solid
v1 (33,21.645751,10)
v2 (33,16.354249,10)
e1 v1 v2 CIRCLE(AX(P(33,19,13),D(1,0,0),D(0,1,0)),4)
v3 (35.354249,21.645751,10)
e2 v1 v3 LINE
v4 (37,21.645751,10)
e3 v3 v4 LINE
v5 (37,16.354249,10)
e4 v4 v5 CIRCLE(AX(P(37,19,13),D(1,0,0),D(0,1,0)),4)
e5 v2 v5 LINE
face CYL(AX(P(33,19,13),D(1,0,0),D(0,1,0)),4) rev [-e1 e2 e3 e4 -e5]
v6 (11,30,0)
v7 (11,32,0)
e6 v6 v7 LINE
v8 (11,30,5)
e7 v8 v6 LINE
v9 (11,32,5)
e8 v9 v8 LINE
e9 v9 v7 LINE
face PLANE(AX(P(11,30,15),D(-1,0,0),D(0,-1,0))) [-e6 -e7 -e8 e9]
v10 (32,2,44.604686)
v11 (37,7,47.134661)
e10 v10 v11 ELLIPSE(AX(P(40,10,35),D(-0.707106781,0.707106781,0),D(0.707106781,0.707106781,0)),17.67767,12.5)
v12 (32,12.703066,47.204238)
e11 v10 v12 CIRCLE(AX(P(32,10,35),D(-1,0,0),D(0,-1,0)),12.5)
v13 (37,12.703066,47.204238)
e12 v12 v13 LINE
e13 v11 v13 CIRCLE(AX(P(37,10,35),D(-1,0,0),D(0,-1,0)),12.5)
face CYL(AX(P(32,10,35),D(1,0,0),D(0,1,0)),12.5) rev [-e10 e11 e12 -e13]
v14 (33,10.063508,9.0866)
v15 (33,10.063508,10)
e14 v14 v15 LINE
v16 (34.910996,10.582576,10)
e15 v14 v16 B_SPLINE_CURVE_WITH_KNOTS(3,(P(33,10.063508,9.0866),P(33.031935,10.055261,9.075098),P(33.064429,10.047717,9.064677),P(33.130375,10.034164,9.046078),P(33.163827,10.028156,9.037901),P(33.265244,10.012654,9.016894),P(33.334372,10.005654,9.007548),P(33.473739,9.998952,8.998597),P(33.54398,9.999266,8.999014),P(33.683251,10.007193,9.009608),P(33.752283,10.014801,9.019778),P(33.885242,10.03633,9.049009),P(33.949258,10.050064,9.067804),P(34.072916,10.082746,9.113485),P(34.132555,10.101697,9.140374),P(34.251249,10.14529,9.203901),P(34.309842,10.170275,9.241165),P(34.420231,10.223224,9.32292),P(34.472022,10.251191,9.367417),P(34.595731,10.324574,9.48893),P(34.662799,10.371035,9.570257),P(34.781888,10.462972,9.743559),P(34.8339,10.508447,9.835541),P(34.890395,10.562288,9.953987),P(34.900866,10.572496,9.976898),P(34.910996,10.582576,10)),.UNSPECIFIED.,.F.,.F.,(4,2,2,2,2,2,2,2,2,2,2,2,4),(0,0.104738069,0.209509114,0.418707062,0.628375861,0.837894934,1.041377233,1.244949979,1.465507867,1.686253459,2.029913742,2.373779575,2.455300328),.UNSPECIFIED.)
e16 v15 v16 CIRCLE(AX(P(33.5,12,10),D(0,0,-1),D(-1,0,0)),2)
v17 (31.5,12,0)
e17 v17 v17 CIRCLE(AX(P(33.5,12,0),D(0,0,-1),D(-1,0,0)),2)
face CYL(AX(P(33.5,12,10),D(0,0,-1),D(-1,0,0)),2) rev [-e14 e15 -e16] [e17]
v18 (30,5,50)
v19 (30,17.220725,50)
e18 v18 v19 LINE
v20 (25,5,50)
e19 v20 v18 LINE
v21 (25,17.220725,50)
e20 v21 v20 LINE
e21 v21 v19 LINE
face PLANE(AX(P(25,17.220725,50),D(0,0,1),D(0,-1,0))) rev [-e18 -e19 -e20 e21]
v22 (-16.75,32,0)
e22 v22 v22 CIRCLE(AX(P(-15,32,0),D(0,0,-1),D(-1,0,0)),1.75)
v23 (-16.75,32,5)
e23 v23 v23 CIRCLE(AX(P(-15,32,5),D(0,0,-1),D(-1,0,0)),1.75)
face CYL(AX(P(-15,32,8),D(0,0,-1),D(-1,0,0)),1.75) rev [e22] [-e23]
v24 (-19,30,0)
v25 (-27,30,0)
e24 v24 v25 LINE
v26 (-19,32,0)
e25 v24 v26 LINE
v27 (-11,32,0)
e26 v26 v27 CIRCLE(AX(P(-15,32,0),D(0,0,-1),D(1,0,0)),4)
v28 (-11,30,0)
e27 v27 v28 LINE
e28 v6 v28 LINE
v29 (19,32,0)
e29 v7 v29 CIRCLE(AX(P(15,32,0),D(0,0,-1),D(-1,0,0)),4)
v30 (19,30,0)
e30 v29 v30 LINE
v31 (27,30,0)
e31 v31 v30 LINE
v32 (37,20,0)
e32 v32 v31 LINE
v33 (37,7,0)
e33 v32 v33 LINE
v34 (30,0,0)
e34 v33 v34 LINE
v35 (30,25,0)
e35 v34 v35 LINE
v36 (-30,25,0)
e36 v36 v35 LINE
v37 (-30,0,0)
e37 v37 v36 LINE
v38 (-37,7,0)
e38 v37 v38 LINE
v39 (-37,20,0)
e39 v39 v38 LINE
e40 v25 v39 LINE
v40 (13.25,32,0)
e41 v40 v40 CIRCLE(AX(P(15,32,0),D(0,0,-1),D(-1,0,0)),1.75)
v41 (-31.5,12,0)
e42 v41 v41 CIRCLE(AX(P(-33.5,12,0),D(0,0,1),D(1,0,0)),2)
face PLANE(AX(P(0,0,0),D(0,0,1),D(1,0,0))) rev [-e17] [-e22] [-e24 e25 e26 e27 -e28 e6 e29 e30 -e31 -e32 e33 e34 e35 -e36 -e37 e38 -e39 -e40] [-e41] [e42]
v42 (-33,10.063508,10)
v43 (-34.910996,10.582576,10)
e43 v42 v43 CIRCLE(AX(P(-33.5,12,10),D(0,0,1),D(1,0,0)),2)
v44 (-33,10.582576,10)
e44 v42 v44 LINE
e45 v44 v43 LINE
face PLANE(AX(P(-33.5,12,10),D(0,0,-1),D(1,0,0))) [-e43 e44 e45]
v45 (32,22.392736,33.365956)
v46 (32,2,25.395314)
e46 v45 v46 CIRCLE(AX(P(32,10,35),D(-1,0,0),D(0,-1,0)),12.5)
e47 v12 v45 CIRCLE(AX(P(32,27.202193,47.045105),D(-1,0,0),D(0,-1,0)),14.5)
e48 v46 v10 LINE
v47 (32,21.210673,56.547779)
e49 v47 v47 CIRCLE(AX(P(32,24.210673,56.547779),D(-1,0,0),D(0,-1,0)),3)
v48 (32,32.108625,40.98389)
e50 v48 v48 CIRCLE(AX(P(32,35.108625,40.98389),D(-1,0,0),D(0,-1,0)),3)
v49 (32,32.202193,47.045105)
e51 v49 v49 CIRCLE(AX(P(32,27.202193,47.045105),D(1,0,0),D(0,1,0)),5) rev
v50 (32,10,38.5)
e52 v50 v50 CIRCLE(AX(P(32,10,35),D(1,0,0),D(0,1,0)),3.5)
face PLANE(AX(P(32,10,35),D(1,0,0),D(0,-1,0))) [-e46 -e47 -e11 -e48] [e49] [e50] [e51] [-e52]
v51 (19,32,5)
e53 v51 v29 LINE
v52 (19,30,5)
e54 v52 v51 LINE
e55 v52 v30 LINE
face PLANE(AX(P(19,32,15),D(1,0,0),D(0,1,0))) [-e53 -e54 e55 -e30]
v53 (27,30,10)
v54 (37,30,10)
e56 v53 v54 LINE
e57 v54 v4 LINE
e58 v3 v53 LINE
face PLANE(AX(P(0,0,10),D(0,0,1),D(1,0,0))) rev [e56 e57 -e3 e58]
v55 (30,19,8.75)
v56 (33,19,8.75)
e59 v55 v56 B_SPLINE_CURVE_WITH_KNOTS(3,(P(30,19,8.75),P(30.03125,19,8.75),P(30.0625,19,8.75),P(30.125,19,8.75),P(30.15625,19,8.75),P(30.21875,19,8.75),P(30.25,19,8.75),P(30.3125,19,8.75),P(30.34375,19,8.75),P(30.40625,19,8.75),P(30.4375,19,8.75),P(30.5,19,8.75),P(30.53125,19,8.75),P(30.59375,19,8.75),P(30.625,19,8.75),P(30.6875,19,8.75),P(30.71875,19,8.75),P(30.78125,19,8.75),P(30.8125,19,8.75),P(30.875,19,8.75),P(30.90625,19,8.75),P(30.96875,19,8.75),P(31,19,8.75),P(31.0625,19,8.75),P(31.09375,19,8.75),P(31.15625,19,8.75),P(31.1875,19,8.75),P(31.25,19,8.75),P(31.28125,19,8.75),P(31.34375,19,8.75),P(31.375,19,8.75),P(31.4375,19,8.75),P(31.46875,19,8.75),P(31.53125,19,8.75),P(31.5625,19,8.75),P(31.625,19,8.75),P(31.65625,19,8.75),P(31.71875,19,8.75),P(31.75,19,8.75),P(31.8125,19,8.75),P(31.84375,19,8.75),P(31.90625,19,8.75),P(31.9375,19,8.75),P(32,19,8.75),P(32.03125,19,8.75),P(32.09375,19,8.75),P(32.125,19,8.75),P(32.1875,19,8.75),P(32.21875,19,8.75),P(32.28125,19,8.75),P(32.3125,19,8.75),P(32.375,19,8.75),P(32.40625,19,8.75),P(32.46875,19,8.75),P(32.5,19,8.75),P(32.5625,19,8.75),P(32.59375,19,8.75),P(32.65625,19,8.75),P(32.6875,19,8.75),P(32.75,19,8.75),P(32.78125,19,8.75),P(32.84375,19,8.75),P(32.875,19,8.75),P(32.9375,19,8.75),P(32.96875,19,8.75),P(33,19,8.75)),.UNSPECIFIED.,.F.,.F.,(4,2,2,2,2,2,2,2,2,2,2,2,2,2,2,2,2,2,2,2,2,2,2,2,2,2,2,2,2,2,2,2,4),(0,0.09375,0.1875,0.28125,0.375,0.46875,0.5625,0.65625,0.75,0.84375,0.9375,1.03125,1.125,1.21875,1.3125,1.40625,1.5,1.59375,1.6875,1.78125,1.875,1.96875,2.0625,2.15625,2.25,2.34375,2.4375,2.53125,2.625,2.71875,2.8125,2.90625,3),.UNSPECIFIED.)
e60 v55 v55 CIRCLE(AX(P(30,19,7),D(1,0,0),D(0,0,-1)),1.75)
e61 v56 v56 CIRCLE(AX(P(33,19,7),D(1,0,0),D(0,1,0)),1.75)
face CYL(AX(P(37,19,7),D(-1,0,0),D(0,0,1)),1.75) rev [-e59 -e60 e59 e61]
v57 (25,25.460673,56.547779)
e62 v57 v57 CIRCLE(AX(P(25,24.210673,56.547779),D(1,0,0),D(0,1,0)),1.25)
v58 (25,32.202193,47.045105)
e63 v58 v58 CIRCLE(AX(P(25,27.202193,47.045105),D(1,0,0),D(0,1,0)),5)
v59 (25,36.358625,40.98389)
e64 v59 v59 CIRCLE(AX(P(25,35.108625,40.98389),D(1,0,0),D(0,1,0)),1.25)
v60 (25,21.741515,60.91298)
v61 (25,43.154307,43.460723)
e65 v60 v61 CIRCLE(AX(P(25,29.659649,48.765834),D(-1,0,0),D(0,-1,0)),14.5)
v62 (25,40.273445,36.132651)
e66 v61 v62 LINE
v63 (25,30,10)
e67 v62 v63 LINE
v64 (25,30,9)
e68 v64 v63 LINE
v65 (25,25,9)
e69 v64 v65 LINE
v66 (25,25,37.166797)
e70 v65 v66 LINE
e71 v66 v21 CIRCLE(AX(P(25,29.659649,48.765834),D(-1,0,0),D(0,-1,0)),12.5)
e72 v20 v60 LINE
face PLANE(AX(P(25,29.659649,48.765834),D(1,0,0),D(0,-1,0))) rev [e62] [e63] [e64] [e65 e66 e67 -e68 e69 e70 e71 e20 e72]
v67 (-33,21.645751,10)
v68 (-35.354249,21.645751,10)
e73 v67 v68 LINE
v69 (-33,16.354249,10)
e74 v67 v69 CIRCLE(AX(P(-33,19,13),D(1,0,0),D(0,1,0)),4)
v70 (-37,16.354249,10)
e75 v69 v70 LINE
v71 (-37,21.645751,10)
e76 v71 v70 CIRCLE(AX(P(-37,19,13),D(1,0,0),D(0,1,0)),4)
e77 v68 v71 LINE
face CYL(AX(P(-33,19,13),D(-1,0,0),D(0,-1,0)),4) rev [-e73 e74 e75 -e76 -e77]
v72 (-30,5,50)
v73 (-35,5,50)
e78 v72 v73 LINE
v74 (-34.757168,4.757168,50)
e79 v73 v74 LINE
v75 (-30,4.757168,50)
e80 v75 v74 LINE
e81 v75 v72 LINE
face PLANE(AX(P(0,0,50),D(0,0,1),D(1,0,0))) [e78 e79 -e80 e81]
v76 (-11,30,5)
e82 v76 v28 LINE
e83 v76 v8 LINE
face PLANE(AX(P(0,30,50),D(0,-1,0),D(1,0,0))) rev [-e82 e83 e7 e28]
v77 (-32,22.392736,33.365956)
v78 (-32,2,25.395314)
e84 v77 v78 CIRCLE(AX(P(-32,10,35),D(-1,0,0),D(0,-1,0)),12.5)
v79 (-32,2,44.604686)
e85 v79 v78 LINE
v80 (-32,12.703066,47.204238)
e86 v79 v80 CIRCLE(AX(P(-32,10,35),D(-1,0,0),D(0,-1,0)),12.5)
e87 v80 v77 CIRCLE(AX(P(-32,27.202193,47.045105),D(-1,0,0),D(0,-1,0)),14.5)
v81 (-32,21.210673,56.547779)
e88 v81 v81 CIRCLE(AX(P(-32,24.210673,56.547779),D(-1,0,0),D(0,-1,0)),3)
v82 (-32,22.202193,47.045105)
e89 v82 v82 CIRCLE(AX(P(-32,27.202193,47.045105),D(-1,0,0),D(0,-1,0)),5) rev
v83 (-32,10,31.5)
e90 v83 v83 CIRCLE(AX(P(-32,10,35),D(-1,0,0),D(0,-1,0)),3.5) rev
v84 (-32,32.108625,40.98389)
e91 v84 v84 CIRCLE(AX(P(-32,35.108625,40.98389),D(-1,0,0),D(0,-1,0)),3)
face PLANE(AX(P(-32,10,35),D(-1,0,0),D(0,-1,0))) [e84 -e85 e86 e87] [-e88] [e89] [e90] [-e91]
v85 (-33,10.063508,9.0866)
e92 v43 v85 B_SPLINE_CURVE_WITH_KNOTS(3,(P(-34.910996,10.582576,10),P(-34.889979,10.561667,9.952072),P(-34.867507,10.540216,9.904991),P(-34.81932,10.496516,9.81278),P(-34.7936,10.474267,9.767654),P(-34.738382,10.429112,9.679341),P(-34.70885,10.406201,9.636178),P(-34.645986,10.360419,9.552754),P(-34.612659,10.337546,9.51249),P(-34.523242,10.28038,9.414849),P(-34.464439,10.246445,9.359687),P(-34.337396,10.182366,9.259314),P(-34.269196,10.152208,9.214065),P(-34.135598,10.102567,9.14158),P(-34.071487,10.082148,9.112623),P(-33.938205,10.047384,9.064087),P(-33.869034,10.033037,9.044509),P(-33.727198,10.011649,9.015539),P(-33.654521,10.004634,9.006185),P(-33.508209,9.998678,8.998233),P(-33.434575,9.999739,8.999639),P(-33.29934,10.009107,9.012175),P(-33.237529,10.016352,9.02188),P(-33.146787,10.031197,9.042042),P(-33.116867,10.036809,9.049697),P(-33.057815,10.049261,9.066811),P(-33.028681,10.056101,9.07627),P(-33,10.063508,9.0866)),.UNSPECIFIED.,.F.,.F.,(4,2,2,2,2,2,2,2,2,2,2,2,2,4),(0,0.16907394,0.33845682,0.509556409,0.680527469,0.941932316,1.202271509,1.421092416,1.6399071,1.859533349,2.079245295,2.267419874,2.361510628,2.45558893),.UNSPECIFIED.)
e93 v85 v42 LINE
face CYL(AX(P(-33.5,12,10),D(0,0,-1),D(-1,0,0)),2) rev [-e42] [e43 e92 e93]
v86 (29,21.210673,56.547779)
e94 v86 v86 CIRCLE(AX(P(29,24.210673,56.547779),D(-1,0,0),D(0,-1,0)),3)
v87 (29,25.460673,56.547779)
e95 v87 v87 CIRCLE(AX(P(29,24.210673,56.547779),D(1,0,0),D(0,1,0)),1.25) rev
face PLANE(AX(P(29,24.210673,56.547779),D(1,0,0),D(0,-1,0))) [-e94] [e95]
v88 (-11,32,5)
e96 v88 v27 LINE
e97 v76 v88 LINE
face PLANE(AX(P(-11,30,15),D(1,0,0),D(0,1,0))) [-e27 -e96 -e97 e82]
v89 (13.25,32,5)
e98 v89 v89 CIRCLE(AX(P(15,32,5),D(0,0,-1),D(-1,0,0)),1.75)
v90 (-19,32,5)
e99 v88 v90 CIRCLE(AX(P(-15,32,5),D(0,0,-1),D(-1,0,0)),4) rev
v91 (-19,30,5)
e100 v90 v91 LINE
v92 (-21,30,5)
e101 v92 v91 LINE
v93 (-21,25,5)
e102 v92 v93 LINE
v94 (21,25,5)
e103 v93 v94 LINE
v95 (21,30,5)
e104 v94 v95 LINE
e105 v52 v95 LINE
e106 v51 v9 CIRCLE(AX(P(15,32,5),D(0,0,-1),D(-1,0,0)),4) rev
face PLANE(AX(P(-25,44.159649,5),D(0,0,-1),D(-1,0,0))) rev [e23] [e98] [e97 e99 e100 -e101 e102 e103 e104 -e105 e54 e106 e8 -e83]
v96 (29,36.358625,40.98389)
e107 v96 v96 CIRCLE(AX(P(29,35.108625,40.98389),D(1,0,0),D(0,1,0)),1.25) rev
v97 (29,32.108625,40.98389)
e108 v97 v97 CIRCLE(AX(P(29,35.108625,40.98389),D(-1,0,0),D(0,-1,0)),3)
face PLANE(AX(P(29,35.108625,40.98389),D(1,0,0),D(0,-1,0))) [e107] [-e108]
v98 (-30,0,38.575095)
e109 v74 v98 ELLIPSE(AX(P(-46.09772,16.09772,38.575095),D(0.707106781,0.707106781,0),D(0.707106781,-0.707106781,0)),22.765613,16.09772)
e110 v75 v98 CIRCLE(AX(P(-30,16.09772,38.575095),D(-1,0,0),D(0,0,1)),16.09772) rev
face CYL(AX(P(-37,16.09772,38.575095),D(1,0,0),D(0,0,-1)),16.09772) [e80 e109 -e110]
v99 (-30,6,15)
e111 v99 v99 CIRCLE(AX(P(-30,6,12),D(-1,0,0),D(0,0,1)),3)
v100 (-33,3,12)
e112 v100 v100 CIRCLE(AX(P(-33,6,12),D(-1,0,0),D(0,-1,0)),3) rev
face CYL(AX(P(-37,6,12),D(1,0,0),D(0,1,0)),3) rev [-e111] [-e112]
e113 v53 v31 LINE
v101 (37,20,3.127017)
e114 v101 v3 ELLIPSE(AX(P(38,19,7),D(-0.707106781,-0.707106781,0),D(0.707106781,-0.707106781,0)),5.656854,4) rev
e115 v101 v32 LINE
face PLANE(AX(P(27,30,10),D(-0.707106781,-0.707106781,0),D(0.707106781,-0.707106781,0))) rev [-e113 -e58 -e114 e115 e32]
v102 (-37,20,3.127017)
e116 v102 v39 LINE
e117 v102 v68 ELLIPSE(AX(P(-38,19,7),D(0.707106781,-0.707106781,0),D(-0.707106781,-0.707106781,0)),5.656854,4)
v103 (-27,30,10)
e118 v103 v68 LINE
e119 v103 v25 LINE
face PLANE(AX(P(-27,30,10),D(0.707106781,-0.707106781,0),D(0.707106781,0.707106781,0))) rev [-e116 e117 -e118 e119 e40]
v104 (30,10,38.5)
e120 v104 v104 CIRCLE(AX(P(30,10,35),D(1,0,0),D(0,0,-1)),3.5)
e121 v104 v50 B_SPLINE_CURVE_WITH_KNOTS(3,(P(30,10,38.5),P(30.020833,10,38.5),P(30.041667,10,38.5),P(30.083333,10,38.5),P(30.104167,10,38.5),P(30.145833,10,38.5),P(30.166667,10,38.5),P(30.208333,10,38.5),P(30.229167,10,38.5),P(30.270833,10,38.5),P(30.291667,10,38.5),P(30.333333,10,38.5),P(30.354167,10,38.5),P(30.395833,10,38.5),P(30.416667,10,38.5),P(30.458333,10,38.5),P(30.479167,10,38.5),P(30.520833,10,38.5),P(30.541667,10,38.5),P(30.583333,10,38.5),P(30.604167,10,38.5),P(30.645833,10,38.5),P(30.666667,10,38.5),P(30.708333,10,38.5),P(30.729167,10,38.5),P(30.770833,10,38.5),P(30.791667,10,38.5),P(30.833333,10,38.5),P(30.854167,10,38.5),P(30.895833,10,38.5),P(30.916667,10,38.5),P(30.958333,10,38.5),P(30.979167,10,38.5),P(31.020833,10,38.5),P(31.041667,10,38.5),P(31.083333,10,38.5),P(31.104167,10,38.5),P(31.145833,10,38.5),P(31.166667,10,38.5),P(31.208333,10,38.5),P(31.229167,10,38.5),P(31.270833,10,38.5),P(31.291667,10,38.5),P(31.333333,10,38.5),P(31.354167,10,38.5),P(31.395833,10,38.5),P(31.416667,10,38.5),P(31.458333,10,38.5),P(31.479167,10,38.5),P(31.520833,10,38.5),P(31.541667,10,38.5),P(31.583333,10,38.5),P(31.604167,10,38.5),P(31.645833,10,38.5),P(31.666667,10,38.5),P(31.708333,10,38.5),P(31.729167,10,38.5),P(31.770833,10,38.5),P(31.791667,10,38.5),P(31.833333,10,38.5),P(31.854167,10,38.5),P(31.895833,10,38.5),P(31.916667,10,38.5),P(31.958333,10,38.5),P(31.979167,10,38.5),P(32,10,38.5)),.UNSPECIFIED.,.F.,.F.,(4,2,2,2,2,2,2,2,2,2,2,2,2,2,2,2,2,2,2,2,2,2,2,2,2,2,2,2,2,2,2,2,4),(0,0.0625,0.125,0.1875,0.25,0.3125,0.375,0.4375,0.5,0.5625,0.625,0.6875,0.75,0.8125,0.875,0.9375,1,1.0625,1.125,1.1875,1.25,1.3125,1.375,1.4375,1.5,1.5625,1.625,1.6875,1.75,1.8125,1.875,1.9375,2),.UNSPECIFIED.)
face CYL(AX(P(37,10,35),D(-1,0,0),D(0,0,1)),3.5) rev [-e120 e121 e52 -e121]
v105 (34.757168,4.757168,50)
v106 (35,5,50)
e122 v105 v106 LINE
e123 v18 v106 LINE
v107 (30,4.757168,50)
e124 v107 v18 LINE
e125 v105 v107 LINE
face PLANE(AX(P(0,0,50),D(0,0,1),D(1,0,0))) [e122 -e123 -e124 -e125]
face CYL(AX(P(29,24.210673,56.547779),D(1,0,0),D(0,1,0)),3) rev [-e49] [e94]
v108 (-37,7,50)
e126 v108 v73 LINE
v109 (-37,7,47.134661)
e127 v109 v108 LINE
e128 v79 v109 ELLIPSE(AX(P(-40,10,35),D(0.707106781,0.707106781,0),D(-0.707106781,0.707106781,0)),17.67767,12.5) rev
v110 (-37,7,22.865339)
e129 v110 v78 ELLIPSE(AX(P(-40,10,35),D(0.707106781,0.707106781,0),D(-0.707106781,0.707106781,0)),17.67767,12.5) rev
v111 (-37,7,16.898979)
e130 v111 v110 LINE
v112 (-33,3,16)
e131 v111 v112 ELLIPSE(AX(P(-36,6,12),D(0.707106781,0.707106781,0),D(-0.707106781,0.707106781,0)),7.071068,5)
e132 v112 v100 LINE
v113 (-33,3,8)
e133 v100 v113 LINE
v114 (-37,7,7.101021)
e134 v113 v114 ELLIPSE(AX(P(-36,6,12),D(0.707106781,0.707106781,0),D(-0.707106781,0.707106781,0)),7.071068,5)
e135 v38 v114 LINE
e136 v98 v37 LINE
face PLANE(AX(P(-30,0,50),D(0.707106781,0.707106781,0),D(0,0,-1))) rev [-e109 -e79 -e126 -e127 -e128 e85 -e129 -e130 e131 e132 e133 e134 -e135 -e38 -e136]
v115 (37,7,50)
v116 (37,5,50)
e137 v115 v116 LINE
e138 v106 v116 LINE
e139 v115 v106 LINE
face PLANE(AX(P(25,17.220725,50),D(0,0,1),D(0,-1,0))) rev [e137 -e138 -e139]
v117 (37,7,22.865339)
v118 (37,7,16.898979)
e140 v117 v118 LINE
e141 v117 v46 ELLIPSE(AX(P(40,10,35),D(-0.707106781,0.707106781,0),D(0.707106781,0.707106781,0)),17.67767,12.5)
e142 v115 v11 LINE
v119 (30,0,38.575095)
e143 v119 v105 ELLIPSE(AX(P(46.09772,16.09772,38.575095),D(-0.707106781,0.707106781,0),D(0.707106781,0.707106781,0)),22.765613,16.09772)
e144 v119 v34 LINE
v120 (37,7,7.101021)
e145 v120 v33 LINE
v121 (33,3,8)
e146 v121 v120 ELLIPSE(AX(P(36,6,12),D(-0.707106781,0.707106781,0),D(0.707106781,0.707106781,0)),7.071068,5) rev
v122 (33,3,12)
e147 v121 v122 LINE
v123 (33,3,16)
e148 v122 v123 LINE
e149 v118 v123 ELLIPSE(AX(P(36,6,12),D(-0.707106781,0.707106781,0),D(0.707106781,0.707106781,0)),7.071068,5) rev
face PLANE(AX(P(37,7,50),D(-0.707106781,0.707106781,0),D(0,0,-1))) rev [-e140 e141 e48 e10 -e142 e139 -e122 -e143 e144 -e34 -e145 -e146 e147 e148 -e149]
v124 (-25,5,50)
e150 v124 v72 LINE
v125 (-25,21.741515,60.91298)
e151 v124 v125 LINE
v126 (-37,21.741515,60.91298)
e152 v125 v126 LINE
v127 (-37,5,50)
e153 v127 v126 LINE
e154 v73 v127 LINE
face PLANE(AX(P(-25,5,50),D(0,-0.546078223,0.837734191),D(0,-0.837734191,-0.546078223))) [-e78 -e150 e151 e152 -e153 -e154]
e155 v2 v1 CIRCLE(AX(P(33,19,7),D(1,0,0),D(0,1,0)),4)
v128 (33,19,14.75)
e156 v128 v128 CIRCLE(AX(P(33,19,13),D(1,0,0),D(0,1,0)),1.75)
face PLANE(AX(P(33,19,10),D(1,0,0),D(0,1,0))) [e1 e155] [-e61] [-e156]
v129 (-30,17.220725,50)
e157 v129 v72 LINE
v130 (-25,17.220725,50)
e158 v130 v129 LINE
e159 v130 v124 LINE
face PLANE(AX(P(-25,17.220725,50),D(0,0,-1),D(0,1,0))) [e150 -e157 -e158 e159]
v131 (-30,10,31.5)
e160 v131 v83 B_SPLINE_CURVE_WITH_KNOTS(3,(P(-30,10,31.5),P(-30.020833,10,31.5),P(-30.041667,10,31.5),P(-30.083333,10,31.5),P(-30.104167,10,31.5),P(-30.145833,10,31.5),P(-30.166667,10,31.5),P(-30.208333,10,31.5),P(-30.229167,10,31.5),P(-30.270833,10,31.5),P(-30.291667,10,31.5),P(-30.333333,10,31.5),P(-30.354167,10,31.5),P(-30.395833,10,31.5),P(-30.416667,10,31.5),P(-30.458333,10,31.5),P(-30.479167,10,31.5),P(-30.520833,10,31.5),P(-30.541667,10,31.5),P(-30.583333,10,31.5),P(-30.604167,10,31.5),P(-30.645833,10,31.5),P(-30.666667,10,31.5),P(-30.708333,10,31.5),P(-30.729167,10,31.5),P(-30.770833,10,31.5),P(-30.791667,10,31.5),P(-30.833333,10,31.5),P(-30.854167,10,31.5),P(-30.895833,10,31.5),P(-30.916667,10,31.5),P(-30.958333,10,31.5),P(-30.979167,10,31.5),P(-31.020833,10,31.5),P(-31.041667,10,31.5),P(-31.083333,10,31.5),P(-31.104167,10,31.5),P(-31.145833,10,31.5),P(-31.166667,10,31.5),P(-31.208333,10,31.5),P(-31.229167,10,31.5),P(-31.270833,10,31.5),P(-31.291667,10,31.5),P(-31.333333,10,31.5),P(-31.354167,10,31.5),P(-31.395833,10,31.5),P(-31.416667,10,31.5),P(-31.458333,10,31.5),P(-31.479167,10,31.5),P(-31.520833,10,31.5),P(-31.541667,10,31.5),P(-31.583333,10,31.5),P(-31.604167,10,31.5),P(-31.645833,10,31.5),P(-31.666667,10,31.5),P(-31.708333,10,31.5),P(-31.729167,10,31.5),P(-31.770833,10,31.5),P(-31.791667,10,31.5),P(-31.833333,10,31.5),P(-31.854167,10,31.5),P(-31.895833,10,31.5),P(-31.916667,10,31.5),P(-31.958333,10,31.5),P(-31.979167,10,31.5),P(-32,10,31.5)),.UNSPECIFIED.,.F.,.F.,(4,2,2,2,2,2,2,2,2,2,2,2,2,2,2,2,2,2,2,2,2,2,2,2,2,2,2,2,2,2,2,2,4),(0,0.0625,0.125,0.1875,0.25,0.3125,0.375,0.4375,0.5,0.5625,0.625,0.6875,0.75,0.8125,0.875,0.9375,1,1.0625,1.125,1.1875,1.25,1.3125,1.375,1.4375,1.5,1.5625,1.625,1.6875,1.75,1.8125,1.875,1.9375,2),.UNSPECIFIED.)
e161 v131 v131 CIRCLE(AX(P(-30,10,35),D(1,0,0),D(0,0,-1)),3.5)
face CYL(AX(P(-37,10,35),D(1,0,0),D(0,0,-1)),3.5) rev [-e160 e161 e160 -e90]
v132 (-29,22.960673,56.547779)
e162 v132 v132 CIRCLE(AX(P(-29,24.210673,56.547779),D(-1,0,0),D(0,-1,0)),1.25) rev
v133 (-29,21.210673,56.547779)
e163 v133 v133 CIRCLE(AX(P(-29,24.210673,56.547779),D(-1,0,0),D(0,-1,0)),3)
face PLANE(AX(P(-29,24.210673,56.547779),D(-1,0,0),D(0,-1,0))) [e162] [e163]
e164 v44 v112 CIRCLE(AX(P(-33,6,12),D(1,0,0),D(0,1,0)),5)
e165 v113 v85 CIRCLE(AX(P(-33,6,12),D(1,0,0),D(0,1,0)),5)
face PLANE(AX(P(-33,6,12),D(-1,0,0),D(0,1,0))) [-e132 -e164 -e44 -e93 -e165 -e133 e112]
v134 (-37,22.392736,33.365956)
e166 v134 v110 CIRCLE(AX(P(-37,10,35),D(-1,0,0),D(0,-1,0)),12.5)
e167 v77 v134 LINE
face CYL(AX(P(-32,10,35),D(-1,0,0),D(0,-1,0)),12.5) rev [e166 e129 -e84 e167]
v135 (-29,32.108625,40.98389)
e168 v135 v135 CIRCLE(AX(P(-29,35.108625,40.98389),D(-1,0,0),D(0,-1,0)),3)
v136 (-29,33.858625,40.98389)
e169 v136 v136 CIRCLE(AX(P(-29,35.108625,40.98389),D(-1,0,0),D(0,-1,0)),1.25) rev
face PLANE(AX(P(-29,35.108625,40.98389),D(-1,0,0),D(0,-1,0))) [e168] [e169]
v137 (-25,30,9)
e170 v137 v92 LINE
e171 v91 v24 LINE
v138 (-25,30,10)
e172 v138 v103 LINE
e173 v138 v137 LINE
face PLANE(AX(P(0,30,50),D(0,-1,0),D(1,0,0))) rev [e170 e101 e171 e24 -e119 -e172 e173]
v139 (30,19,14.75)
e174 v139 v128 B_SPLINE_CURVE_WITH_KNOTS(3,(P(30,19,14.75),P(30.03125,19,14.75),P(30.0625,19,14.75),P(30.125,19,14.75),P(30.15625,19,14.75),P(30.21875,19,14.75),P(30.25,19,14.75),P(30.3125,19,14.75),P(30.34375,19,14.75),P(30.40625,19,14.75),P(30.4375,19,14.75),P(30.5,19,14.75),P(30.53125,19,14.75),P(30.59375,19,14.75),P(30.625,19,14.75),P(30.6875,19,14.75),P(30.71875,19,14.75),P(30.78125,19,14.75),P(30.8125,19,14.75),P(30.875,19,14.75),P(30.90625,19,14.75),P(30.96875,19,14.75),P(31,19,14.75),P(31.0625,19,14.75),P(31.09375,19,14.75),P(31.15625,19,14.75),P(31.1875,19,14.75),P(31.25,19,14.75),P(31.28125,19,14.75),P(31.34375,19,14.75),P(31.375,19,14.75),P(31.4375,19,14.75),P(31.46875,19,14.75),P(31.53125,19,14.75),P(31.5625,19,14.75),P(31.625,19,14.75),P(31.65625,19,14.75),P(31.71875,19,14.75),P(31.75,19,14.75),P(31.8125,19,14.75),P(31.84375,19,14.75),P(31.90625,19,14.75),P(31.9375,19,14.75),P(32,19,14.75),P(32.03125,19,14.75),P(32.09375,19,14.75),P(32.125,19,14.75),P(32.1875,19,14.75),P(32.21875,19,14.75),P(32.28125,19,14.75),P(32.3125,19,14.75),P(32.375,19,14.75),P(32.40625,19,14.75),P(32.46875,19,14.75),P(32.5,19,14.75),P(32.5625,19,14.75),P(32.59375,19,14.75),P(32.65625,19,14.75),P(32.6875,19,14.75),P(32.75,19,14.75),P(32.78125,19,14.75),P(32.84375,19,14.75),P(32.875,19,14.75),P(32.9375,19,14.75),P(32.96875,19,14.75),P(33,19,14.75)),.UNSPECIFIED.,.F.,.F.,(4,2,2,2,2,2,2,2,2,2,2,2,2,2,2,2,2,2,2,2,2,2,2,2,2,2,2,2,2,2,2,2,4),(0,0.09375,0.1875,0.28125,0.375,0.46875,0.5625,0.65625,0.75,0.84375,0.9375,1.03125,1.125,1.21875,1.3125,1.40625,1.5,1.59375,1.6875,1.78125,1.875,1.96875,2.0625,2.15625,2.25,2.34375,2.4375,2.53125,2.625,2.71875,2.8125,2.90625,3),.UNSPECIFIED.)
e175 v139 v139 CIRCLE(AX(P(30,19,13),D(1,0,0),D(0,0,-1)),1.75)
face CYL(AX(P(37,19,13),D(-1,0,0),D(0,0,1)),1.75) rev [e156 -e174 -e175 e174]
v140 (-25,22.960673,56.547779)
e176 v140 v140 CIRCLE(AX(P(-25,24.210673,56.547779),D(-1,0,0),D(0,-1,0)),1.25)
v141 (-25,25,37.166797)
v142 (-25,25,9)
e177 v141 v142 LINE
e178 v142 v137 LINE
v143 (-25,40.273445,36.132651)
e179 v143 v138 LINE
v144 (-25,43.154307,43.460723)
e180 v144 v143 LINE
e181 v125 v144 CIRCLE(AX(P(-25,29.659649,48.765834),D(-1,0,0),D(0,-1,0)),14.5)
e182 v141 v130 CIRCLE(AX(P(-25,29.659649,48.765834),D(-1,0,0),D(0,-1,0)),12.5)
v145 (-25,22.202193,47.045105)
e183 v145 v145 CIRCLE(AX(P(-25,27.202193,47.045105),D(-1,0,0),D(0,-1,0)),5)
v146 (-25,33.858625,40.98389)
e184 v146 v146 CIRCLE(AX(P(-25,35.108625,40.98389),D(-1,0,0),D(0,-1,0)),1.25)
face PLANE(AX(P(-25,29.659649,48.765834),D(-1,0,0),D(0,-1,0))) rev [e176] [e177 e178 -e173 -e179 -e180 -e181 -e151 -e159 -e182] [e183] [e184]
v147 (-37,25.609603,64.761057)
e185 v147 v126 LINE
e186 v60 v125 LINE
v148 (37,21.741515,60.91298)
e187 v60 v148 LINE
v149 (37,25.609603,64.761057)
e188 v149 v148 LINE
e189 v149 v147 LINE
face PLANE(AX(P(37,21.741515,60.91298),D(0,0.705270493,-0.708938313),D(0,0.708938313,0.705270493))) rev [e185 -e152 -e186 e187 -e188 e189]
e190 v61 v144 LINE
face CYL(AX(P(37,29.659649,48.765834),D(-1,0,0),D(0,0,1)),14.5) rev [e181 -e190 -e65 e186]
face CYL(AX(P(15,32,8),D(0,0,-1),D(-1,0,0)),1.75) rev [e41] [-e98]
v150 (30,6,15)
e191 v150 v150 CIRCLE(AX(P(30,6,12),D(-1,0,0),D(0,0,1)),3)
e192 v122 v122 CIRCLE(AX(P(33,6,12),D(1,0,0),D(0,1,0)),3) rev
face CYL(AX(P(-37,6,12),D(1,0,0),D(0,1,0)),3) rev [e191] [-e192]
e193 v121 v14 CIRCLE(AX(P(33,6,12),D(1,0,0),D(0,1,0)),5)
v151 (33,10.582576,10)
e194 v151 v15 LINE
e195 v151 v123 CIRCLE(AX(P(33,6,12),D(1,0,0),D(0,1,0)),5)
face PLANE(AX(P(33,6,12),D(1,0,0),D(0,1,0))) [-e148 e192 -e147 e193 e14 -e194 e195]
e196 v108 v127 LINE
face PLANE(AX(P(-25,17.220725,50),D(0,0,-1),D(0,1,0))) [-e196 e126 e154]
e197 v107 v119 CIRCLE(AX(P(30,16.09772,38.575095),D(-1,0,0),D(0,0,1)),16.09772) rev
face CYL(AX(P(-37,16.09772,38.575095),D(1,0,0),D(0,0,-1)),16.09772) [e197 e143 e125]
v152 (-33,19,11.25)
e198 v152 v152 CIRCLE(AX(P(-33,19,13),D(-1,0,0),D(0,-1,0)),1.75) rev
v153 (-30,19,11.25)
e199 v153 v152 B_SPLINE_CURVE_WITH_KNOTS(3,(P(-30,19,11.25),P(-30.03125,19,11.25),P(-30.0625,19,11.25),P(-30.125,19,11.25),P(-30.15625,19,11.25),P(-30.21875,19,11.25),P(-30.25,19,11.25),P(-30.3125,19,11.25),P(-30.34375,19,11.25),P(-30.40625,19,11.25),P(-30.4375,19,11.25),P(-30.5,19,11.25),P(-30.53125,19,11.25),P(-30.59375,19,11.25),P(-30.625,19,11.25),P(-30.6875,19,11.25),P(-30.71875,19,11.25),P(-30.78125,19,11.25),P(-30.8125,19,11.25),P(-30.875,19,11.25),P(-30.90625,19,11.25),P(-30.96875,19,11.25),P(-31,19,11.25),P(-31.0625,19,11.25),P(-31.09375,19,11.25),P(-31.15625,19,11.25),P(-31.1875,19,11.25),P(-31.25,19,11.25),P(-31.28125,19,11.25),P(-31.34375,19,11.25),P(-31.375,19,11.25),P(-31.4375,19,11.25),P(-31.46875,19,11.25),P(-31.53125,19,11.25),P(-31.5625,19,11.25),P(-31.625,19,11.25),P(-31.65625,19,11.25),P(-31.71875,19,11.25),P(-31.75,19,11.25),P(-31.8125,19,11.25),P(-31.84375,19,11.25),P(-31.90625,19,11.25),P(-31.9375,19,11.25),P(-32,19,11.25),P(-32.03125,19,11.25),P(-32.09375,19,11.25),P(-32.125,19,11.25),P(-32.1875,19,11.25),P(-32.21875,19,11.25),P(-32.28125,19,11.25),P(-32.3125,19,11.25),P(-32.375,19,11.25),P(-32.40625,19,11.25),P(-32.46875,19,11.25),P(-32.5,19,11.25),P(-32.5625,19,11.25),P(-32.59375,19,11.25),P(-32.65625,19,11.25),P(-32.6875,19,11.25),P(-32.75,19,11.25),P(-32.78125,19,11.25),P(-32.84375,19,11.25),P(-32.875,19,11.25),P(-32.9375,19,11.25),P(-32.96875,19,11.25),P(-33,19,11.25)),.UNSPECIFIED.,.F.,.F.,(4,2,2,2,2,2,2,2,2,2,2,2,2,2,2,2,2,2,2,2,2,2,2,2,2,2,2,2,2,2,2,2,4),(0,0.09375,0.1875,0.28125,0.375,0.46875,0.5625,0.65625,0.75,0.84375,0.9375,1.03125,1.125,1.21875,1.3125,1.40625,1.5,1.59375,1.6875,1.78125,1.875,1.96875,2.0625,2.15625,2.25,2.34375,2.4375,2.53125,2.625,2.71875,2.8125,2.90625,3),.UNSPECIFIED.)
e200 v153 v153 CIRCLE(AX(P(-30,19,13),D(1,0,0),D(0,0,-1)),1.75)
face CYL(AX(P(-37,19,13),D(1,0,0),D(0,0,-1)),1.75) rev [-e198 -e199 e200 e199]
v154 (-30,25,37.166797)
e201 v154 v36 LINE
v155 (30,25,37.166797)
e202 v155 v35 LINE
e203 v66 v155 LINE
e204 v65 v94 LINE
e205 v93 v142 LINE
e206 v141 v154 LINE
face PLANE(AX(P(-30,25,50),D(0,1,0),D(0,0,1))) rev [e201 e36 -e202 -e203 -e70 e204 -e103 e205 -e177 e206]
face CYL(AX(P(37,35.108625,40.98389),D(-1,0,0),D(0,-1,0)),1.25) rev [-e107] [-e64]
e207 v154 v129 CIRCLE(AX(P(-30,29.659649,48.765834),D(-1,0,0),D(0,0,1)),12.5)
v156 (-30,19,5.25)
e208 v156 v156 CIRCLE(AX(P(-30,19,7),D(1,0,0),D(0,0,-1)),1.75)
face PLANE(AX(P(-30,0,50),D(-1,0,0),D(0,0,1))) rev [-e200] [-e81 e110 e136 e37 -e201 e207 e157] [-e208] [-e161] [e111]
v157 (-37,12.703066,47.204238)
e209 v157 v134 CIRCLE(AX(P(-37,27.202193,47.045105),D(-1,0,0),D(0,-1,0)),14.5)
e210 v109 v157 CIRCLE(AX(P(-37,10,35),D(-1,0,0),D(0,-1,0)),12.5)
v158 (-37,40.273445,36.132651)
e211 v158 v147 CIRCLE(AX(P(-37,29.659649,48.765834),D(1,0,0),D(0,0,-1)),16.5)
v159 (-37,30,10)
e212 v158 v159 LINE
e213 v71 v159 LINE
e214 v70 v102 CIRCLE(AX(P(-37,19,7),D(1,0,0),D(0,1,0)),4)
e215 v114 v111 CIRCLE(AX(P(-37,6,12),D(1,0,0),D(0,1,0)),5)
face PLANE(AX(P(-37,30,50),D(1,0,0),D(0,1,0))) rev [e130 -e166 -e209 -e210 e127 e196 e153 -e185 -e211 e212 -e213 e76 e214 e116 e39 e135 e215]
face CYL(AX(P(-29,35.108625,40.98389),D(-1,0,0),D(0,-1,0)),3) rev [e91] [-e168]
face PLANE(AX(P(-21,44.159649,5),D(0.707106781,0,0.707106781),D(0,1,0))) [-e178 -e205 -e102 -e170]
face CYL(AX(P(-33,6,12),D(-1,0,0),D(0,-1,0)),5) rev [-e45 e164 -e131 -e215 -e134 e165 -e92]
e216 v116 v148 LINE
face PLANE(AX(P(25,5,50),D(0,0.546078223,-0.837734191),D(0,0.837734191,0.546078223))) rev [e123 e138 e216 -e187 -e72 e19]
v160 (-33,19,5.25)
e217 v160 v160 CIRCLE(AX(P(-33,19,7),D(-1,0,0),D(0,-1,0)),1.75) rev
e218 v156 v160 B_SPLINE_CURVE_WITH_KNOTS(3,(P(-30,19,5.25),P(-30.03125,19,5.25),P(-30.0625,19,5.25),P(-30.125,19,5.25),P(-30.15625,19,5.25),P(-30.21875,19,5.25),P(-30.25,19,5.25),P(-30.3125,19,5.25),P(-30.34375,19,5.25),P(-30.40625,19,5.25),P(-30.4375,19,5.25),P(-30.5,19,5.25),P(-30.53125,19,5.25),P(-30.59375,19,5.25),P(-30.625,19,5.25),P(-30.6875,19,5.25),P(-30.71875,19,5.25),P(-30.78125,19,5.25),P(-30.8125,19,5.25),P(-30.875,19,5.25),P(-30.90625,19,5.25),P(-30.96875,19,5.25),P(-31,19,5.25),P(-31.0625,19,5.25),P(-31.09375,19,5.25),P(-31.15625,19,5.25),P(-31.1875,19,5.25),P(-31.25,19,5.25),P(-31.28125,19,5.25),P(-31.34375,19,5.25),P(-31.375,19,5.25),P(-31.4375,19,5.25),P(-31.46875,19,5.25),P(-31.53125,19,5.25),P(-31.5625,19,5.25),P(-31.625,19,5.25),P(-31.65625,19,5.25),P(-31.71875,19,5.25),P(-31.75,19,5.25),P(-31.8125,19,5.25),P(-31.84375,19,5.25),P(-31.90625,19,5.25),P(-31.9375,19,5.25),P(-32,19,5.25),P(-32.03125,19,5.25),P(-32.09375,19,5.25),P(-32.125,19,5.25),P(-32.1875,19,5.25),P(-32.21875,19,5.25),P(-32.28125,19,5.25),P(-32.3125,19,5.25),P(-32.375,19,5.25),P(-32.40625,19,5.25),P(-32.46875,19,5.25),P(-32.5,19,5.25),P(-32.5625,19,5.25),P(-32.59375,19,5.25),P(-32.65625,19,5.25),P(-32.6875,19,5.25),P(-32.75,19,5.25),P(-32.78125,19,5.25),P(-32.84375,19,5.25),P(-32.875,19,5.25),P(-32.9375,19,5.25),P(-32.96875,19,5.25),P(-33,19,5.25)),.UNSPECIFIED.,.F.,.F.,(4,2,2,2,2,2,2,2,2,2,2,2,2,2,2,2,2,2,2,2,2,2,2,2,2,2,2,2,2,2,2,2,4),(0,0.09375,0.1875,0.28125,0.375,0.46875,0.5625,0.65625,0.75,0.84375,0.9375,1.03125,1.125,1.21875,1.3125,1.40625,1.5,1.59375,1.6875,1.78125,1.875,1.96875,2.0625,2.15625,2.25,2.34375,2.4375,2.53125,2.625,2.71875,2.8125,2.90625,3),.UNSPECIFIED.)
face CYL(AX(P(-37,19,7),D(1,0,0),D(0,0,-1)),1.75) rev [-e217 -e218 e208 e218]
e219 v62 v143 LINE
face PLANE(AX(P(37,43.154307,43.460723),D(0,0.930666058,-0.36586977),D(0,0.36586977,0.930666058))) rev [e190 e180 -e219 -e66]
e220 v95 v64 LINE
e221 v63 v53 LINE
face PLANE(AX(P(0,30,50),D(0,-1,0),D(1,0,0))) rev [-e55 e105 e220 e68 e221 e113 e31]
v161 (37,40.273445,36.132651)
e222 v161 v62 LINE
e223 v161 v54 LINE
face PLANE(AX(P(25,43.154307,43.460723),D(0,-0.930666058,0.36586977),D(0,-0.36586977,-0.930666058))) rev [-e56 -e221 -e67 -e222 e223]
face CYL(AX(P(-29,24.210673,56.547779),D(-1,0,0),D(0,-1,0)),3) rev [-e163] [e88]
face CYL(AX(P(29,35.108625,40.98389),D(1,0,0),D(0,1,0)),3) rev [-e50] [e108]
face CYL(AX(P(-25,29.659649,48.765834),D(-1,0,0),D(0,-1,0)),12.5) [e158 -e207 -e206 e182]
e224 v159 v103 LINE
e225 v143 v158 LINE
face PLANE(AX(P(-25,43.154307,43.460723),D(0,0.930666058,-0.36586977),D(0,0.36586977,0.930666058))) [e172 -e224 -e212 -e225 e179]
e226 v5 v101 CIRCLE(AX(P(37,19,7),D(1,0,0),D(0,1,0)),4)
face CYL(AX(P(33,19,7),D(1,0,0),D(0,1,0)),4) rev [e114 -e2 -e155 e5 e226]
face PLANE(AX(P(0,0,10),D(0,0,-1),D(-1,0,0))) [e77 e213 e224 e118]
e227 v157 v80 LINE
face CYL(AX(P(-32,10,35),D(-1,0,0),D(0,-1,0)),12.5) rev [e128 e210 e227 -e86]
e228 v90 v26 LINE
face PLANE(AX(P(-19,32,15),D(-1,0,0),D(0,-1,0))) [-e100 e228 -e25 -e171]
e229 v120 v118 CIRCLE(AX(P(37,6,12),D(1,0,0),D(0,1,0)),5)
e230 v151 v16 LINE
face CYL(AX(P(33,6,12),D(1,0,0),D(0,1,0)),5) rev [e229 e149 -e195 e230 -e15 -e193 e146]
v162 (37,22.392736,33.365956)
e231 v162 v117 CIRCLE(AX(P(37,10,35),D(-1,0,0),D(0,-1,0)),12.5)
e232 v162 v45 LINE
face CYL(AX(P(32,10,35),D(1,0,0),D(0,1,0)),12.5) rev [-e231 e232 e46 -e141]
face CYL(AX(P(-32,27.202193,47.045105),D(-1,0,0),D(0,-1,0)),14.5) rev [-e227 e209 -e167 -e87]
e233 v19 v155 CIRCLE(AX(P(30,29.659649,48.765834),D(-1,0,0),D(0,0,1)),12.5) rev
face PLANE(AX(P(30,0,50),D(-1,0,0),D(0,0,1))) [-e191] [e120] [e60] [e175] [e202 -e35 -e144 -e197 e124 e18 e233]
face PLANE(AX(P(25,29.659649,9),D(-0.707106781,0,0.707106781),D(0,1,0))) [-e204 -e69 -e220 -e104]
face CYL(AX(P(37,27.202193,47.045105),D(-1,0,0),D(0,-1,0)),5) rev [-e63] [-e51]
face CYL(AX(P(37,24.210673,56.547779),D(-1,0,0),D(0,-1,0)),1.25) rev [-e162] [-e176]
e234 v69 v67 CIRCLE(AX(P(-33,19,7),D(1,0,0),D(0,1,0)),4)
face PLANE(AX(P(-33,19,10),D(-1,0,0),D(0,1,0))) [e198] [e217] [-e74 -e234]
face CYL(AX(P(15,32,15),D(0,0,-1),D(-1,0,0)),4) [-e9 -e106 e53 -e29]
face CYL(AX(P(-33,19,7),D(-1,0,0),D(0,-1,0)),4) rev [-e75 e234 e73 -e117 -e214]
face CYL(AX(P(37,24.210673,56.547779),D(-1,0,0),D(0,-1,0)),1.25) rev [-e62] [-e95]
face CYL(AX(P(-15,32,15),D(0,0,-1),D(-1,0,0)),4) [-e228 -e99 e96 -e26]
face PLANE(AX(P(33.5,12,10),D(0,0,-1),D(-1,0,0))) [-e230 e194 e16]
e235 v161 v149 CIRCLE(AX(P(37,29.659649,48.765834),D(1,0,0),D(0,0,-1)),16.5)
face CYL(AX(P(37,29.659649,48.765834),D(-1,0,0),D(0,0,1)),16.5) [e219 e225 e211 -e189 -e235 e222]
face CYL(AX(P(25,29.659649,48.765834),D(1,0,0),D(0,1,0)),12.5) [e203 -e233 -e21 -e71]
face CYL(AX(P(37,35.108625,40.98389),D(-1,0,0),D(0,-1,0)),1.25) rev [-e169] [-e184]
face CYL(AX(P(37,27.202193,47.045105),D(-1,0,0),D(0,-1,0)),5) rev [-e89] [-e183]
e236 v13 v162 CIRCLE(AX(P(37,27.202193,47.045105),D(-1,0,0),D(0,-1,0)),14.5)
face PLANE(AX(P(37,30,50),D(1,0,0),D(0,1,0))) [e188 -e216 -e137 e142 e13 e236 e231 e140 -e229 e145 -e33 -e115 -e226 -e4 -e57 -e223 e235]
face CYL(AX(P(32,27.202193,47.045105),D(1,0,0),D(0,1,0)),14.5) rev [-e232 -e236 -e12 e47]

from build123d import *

# Parameters (mm, degrees)
BOSS_EXTRUDE1_DEPTH      = 50
CHAMFER1_SIZE            = 7
SKETCH2_R                = 3.5
CUT_EXTRUDE1_DEPTH       = 66.574385243
SKETCH3_R                = 1.75
CUT_EXTRUDE2_DEPTH       = 66.574385243
SKETCH5_R                = 12.5
CUT_EXTRUDE4_DEPTH       = 5
BOSS_EXTRUDE2_DEPTH      = 12
SKETCH4_W                = 50
SKETCH4_H                = 45
CUT_EXTRUDE3_DEPTH       = 78.43749616
SKETCH7_R                = 1.25
SKETCH7_R_2              = 5
CUT_EXTRUDE5_DEPTH       = 107.904819428
SKETCH8_R                = 14.5
CUT_EXTRUDE6_DEPTH       = 5
SKETCH9_R                = 3
CUT_EXTRUDE7_DEPTH       = 3
SKETCH11_R               = 2
CUT_EXTRUDE8_DEPTH       = 10
BOSS_EXTRUDE3_DEPTH      = 37
SKETCH12_R               = 3
CUT_EXTRUDE9_DEPTH       = 109.932742328
SKETCH13_R               = 5
CUT_EXTRUDE10_DEPTH      = 4
BOSS_EXTRUDE4_DEPTH      = 5
SKETCH16_R               = 1.75
CUT_EXTRUDE12_DEPTH      = 8
CHAMFER2_SIZE            = 4
CUT_EXTRUDE14_DEPTH      = 10
CUT_EXTRUDE15_DEPTH      = 89.087129357
CUT_EXTRUDE15_DEPTH_BACK = 89.087129357


# Read off the part's stored shape, not the designer's step: Mirror1
with BuildPart() as part:
    # Sketch1 → Boss-Extrude1 (new body)
    with BuildSketch(Plane.XY):
        Polygon((-30, 0), (-30, 25), (0, 25), (0, 30), (-37, 30), (-37, 0), align=None)
    extrude(amount=BOSS_EXTRUDE1_DEPTH)

    # Chamfer1
    chamfer1_edges = [part.edges().sort_by_distance(p)[0] for p in [
        (-37, 0, 25),
    ]]
    chamfer(chamfer1_edges, length=CHAMFER1_SIZE - 0.0001)  # a hair under: the kernel refuses the full size

    # Sketch2 → Cut-Extrude1 (cut, through all)
    with BuildSketch(Plane(origin=(-30, 0, 0), x_dir=(0, 0, -1), z_dir=(1, 0, 0))):
        with Locations((-35, 10)):
            Circle(SKETCH2_R)
    extrude(amount=-CUT_EXTRUDE1_DEPTH, mode=Mode.SUBTRACT)

    # Sketch3 → Cut-Extrude2 (cut, through all)
    with BuildSketch(Plane(origin=(-30, 0, 0), x_dir=(0, 0, -1), z_dir=(1, 0, 0))):
        with Locations((-7, 19)):
            Circle(SKETCH3_R)
        with Locations((-13, 19)):
            Circle(SKETCH3_R)
    extrude(amount=-CUT_EXTRUDE2_DEPTH, mode=Mode.SUBTRACT)

    # Sketch5 → Cut-Extrude4 (cut)
    with BuildSketch(Plane.ZY.offset(37)):
        with Locations((35, 10)):
            Circle(SKETCH5_R)
    extrude(amount=-CUT_EXTRUDE4_DEPTH, mode=Mode.SUBTRACT)

    # Sketch6 → Boss-Extrude2 (add)
    with BuildSketch(Plane.ZY.offset(37)):
        with BuildLine():
            Line((43.46072281, 43.154306904), (10, 30))
            Line((10, 30), (36.270468882, 30))
            ThreePointArc((36.270468882, 30), (40.249313761, 20.509847154), (50, 17.220724855))
            Line((50, 17.220724855), (50, 5))
            Line((50, 5), (60.912980238, 21.741514829))
            ThreePointArc((60.912980238, 21.741514829), (60.005508568, 38.820420112), (43.46072281, 43.154306904))
        make_face()
    extrude(amount=-BOSS_EXTRUDE2_DEPTH)

    # Mirror1: part across plane


with BuildPart() as part_1:
    add(part.part)
    add(part.part.mirror(Plane(origin=(0, 0, 0), x_dir=(0, 0, 1), z_dir=(1, 0, 0))))

    # Sketch4 → Cut-Extrude3 (cut, through all)
    with BuildSketch(Plane.XZ.offset(-25)):
        with Locations((0, 27.5)):
            Rectangle(SKETCH4_W, SKETCH4_H)
    extrude(amount=-CUT_EXTRUDE3_DEPTH, mode=Mode.SUBTRACT)

    # Sketch7 → Cut-Extrude5 (cut, through all)
    with BuildSketch(Plane.ZY.offset(37)):
        with Locations(Location((40.983890052, 35.108625208, 0), (0, 0, 270))):
            Circle(SKETCH7_R)
        with Locations(Location((56.547778893, 24.210672918, 0), (0, 0, 270))):
            Circle(SKETCH7_R)
        with Locations(Location((47.045105163, 27.20219293, 0), (0, 0, 270))):
            Circle(SKETCH7_R_2)
    extrude(amount=-CUT_EXTRUDE5_DEPTH, mode=Mode.SUBTRACT)

    # Sketch8 → Cut-Extrude6 (cut)
    with BuildSketch(Plane.ZY.offset(37)):
        with Locations((47.045105163, 27.20219293)):
            Circle(SKETCH8_R)
    cut_extrude6 = extrude(amount=-CUT_EXTRUDE6_DEPTH, mode=Mode.SUBTRACT)

    # Sketch9 → Cut-Extrude7 (cut)
    with BuildSketch(Plane.ZY.offset(32)):
        with Locations(Location((40.983890052, 35.108625208, 0), (0, 0, 270))):
            Circle(SKETCH9_R)
        with Locations(Location((56.547778893, 24.210672918, 0), (0, 0, 270))):
            Circle(SKETCH9_R)
    cut_extrude7 = extrude(amount=-CUT_EXTRUDE7_DEPTH, mode=Mode.SUBTRACT)

    # Sketch11 → Cut-Extrude8 (cut)
    with BuildSketch(Plane(origin=(0, 0, 0), x_dir=(-1, 0, 0), z_dir=(0, 0, -1))):
        with Locations((-33.5, 12)):
            Circle(SKETCH11_R)
    cut_extrude8 = extrude(amount=-CUT_EXTRUDE8_DEPTH, mode=Mode.SUBTRACT)

    # Mirror2: Cut-Extrude6, Cut-Extrude7, Cut-Extrude8 across plane
    add(cut_extrude6.mirror(Plane(origin=(0, 0, 0), x_dir=(0, 0, 1), z_dir=(1, 0, 0))), mode=Mode.SUBTRACT)
    add(cut_extrude7.mirror(Plane(origin=(0, 0, 0), x_dir=(0, 0, 1), z_dir=(1, 0, 0))), mode=Mode.SUBTRACT)
    add(cut_extrude8.mirror(Plane(origin=(0, 0, 0), x_dir=(0, 0, 1), z_dir=(1, 0, 0))), mode=Mode.SUBTRACT)

    # Sketch10 → Boss-Extrude3 (add, symmetric)
    with BuildSketch(Plane(origin=(0, 0, 0), x_dir=(0, 0, -1), z_dir=(1, 0, 0))):
        with BuildLine():
            Line((-43.46072281, 43.154306904), (-36.132650941, 40.273445456))
            ThreePointArc((-36.132650941, 40.273445456), (-56.287994506, 44.345257951), (-64.761056584, 25.609603432))
            Line((-64.761056584, 25.609603432), (-60.912980238, 21.741514829))
            ThreePointArc((-60.912980238, 21.741514829), (-60.005508568, 38.820420112), (-43.46072281, 43.154306904))
        make_face()
    extrude(amount=BOSS_EXTRUDE3_DEPTH, both=True)

    # Sketch12 → Cut-Extrude9 (cut, through all)
    with BuildSketch(Plane(origin=(37, 0, 0), x_dir=(0, 0, -1), z_dir=(1, 0, 0))):
        with Locations(Location((-12, 6, 0), (0, 0, 19.471220634))):
            Circle(SKETCH12_R)
    extrude(amount=-CUT_EXTRUDE9_DEPTH, mode=Mode.SUBTRACT)

    # Sketch13 → Cut-Extrude10 (cut)
    with BuildSketch(Plane(origin=(37, 0, 0), x_dir=(0, 0, -1), z_dir=(1, 0, 0))):
        with Locations((-12, 6)):
            Circle(SKETCH13_R)
        with BuildLine():
            ThreePointArc((-10, 21.645751311), (-17, 19), (-10, 16.354248689))
            ThreePointArc((-10, 16.354248689), (-3, 19), (-10, 21.645751311))
        make_face()
    cut_extrude10 = extrude(amount=-CUT_EXTRUDE10_DEPTH, mode=Mode.SUBTRACT)

    # Mirror3: Cut-Extrude10 across plane
    add(cut_extrude10.mirror(Plane(origin=(0, 0, 0), x_dir=(0, 0, 1), z_dir=(1, 0, 0))), mode=Mode.SUBTRACT)

    # Sketch15 → Boss-Extrude4 (add)
    with BuildSketch(Plane(origin=(0, 0, 0), x_dir=(-1, 0, 0), z_dir=(0, 0, -1))):
        with BuildLine():
            Line((-19, 32), (-19, 30))
            Line((-19, 30), (-11, 30))
            Line((-11, 30), (-11, 32))
            ThreePointArc((-11, 32), (-15, 36), (-19, 32))
        make_face()
        with BuildLine():
            Line((11, 30), (11, 32))
            ThreePointArc((11, 32), (15, 36), (19, 32))
            Line((19, 32), (19, 30))
            Line((19, 30), (11, 30))
        make_face()
    extrude(amount=-BOSS_EXTRUDE4_DEPTH)

    # Sketch16 → Cut-Extrude12 (cut)
    with BuildSketch(Plane(origin=(0, 0, 0), x_dir=(-1, 0, 0), z_dir=(0, 0, -1))):
        with Locations((-15, 32)):
            Circle(SKETCH16_R)
        with Locations((15, 32)):
            Circle(SKETCH16_R)
    extrude(amount=-CUT_EXTRUDE12_DEPTH, mode=Mode.SUBTRACT)

    # Chamfer2
    chamfer2_edges = [part_1.edges().sort_by_distance(p)[0] for p in [
        (25, 27.5, 5),
        (-25, 27.5, 5),
    ]]
    chamfer(chamfer2_edges, length=CHAMFER2_SIZE)

    # Sketch17 → Cut-Extrude14 (cut)
    with BuildSketch(Plane(origin=(0, 0, 0), x_dir=(-1, 0, 0), z_dir=(0, 0, -1))):
        Polygon((-37, 20), (-37, 30), (-27, 30), align=None)
        Polygon((37, 30), (27, 30), (37, 20), align=None)
    extrude(amount=-CUT_EXTRUDE14_DEPTH, mode=Mode.SUBTRACT)

    # Sketch18 → Cut-Extrude15 (cut, two sides: drawn at the far end of the back side and taken through both)
    with BuildSketch(Plane(origin=(0, 0, 0), x_dir=(0, 0, -1), z_dir=(1, 0, 0)).offset(-CUT_EXTRUDE15_DEPTH_BACK)):
        with BuildLine():
            Line((-38.575094924, 0), (-50, 0))
            Line((-50, 0), (-53.770765751, 10.784701278))
            ThreePointArc((-53.770765751, 10.784701278), (-47.891990779, 2.970190216), (-38.575094924, 0))
        make_face()
    extrude(amount=CUT_EXTRUDE15_DEPTH + CUT_EXTRUDE15_DEPTH_BACK, mode=Mode.SUBTRACT)


solid = part_1.part
